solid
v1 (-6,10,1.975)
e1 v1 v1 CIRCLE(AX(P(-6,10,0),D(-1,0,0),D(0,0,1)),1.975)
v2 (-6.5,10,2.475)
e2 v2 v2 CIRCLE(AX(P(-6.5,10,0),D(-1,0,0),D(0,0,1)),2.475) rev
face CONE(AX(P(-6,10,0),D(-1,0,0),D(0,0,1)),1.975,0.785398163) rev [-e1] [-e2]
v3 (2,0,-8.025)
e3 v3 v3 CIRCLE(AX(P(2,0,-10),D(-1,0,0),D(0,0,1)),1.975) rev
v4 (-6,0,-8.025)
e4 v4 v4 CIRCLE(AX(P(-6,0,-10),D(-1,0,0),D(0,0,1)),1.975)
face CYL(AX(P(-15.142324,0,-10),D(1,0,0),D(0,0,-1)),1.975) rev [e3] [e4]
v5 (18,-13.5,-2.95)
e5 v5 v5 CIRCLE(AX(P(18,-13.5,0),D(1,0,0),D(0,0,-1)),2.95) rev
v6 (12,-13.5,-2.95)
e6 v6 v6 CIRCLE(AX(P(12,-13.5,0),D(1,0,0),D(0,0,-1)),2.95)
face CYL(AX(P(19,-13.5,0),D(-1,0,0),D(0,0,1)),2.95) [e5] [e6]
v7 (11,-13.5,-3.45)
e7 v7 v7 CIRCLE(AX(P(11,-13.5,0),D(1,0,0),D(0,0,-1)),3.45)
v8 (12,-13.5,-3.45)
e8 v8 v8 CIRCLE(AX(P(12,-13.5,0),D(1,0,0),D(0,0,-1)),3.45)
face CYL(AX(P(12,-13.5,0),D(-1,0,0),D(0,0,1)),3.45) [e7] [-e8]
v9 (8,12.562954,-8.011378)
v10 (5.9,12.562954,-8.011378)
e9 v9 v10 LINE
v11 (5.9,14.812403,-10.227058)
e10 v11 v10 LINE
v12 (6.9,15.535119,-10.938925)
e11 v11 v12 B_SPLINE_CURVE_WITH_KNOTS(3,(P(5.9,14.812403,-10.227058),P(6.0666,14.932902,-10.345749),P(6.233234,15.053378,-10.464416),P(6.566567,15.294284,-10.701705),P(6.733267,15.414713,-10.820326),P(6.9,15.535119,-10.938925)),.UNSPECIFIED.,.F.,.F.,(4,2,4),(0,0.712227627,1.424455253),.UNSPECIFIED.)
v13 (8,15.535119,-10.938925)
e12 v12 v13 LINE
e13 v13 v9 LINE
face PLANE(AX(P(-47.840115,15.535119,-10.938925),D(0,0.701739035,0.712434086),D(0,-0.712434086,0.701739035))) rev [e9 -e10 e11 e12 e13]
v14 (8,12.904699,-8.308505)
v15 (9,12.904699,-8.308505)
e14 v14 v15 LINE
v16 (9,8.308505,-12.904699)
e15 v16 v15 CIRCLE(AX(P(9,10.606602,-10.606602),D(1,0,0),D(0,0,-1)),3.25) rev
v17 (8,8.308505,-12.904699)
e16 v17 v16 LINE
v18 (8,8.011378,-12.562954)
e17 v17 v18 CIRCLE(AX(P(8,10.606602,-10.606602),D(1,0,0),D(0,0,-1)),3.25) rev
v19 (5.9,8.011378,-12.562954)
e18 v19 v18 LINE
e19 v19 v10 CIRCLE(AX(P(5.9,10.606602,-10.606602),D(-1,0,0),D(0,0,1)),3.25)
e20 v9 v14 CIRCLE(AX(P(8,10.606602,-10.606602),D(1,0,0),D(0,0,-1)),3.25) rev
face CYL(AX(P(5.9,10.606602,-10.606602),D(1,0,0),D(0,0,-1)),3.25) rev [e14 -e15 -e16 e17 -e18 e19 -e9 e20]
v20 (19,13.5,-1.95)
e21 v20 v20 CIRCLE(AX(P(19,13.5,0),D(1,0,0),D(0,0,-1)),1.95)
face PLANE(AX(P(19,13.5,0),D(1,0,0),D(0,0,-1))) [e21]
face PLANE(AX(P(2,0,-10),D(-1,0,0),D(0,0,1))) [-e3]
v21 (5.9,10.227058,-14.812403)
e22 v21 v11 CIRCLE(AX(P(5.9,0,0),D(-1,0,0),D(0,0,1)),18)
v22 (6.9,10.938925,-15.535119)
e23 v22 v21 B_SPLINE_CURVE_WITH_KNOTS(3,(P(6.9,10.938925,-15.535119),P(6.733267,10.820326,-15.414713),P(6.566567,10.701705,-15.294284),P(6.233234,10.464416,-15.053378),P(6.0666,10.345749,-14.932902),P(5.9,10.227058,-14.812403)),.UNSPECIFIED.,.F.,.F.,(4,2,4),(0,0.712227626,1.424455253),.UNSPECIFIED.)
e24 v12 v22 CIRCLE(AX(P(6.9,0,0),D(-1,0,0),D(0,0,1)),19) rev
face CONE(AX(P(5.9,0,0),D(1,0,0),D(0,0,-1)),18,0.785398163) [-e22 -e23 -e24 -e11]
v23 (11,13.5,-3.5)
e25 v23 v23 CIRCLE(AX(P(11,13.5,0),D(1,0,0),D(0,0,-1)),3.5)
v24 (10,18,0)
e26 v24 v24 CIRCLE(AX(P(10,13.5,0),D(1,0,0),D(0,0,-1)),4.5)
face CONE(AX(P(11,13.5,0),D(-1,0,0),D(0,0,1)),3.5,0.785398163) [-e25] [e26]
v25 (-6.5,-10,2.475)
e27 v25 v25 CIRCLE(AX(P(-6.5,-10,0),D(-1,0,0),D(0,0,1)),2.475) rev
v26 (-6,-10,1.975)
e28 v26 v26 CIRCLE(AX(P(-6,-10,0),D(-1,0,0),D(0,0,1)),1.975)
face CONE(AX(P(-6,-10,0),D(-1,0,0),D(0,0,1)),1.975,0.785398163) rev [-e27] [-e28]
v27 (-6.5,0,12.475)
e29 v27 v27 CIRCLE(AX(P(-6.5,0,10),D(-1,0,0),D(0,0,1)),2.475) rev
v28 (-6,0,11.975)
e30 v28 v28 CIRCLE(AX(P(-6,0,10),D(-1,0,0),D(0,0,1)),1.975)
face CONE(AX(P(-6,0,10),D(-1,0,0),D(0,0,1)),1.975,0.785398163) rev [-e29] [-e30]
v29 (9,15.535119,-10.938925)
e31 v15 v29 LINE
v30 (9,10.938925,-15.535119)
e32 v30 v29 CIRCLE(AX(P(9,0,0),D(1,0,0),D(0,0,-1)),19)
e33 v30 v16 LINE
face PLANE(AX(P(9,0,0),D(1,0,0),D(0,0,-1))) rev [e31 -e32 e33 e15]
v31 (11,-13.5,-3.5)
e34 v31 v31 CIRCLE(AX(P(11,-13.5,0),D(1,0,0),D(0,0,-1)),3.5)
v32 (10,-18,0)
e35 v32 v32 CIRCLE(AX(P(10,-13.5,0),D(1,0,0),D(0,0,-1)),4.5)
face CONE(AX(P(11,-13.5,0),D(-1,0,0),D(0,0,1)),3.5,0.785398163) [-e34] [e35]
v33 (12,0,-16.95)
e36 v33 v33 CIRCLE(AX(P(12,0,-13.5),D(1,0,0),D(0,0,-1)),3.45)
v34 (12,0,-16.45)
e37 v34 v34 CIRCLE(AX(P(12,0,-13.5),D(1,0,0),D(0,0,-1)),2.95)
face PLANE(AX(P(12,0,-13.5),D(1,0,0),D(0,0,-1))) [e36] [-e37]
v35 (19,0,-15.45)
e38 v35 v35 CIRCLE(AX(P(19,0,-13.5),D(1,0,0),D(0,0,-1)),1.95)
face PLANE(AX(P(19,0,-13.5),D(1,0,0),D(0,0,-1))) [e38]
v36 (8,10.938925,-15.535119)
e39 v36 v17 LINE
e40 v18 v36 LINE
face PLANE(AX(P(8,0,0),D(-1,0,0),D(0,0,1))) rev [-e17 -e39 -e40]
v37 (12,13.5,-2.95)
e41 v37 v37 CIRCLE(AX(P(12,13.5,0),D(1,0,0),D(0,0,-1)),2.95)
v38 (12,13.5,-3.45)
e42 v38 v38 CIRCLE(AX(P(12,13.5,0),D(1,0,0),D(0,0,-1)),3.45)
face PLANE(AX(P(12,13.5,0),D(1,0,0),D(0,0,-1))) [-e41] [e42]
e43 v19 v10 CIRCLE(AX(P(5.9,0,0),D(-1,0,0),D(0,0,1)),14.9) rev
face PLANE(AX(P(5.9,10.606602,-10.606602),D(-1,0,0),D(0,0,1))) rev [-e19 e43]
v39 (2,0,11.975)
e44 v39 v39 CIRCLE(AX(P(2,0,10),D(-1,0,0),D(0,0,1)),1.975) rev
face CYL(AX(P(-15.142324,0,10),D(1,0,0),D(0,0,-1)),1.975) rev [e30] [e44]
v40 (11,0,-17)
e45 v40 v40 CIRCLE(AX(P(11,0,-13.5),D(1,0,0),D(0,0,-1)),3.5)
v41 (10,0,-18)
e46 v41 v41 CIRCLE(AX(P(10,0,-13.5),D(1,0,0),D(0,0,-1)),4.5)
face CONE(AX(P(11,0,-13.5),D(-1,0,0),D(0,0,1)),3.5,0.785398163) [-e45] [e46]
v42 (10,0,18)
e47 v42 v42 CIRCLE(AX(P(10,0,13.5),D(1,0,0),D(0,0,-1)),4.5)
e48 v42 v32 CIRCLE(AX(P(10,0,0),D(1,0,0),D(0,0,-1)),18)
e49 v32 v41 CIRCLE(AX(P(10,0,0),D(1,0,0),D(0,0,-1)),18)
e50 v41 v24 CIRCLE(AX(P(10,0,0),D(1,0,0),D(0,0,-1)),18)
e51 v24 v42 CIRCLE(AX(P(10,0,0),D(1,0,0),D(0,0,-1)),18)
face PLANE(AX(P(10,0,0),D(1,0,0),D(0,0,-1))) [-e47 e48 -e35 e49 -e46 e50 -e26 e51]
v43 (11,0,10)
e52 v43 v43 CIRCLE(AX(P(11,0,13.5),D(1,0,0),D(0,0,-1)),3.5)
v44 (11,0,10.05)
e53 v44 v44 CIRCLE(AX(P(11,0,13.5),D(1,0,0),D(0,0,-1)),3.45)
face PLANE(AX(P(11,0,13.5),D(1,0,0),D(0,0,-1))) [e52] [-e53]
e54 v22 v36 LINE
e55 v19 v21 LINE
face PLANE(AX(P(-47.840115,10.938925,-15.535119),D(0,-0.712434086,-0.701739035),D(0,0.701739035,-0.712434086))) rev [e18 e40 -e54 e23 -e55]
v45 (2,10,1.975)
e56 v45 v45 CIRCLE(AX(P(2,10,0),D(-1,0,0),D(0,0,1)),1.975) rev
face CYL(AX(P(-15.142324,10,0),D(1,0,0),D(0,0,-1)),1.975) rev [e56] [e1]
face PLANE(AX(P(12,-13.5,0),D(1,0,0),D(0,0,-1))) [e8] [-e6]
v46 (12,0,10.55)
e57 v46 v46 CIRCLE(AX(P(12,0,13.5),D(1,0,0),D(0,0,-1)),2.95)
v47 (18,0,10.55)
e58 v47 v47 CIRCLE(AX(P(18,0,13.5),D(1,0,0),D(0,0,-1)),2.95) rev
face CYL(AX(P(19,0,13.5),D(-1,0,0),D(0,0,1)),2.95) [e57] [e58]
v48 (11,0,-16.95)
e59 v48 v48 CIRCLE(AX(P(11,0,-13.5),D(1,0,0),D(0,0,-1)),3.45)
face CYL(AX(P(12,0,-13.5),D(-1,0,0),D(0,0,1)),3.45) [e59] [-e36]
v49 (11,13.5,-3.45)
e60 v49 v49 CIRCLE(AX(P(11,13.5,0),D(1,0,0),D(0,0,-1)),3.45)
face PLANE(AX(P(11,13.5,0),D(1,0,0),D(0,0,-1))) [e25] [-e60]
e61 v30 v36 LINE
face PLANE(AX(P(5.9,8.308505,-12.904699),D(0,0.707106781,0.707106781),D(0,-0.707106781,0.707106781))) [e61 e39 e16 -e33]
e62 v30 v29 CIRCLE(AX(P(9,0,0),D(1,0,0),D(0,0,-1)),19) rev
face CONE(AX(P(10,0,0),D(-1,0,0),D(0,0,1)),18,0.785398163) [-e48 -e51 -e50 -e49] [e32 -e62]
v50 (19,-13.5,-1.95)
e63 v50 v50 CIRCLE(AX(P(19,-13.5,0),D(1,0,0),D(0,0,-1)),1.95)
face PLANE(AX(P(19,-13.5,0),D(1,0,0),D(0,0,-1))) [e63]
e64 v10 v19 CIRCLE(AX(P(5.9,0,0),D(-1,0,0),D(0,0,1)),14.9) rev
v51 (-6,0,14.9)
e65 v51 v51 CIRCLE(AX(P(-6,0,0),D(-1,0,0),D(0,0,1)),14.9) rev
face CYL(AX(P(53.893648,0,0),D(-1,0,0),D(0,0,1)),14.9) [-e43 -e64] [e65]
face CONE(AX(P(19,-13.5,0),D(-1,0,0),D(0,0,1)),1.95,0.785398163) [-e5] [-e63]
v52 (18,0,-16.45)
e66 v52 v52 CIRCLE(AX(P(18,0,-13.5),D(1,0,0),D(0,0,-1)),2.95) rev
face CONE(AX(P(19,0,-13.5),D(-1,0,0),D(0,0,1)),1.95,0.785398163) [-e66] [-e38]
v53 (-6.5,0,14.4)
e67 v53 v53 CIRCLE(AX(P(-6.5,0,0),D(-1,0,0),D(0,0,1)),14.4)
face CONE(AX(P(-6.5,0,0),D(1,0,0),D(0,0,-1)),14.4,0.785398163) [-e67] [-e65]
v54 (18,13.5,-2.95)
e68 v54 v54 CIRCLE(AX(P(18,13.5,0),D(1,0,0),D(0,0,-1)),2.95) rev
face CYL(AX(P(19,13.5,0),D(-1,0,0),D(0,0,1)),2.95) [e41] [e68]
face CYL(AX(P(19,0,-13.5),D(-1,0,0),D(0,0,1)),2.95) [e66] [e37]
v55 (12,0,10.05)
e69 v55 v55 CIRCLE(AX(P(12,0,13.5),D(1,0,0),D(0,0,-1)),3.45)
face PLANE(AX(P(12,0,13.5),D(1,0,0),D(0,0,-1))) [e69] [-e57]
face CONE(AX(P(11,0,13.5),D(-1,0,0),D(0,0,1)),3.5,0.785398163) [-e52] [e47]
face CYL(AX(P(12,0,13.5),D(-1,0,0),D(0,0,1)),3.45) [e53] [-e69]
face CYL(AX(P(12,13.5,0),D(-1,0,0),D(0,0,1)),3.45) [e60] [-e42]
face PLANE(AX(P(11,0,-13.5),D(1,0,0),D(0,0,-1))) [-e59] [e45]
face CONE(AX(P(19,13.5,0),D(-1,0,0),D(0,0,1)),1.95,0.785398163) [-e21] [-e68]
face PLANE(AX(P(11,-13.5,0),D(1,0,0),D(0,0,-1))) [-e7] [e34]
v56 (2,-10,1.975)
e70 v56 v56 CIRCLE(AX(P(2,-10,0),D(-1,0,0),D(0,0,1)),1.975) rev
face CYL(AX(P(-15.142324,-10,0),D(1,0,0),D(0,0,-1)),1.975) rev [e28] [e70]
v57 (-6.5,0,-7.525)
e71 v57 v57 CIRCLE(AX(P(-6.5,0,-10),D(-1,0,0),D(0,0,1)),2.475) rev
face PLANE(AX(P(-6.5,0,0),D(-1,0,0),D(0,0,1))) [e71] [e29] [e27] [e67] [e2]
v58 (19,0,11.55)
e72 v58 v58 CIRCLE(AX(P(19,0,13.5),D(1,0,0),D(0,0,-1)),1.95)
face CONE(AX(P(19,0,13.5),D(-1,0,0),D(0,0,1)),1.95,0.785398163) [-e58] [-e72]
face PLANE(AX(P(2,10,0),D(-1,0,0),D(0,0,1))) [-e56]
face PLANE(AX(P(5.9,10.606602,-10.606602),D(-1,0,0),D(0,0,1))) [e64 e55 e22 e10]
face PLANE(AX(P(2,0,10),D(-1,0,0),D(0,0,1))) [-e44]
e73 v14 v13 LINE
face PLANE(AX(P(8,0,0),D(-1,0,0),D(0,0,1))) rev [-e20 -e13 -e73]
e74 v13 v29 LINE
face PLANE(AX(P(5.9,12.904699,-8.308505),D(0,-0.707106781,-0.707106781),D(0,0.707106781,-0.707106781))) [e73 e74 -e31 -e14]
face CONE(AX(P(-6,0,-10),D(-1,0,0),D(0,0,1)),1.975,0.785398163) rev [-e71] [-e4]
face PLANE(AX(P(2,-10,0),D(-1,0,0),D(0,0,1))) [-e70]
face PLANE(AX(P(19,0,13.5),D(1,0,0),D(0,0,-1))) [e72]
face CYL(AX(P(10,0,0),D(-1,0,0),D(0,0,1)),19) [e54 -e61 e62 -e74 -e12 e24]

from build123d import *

# Parameters (mm, degrees)
BOSS_EXTRUDE1_OUTLINE_R   = 19
BOSS_EXTRUDE1_DEPTH       = 2
BOSS_EXTRUDE1_START       = -8
BOSS_EXTRUDE1_2_OUTLINE_R = 2.5
BOSS_EXTRUDE1_2_DEPTH     = 8
SKETCH2_R                 = 3.5
CUT_EXTRUDE1_DEPTH        = 29.670542374
SKETCH3_R                 = 2.95
BOSS_EXTRUDE2_DEPTH       = 9
BOSS_EXTRUDE3_START       = 4
SKETCH5_R                 = 3.5
BOSS_EXTRUDE3_DEPTH       = 4
SKETCH6_R                 = 8.643788813
CUT_EXTRUDE2_DEPTH        = 12
BOSS_EXTRUDE4_START       = -2
SKETCH7_R                 = 3.5
BOSS_EXTRUDE4_DEPTH       = 2
SKETCH8_R                 = 12.5
BOSS_EXTRUDE5_DEPTH       = 10
SKETCH9_R                 = 2
CUT_EXTRUDE3_DEPTH        = 4
SKETCH10_R                = 15
SKETCH10_R_2              = 12.5
BOSS_EXTRUDE6_DEPTH       = 10
SKETCH11_R                = 16.225854921
SKETCH11_R_2              = 14.9
CUT_EXTRUDE4_DEPTH        = 10
SKETCH12_R                = 4.5
BOSS_EXTRUDE7_DEPTH       = 1
BOSS_EXTRUDE8_START       = 2
SKETCH13_R                = 14.9
SKETCH13_R_2              = 2
BOSS_EXTRUDE8_DEPTH       = 2
SKETCH14_R                = 3.45
BOSS_EXTRUDE9_DEPTH       = 1
CHAMFER1_SIZE             = 1
CHAMFER2_SIZE             = 1
BOSS_EXTRUDE12_START      = 2.5
SKETCH21_R                = 14.9
SKETCH21_R_2              = 2
BOSS_EXTRUDE12_DEPTH      = 2.5
CHAMFER3_SIZE             = 0.5
SKETCH17_R                = 3.065
BOSS_EXTRUDE10_DEPTH      = 1
CHAMFER5_SIZE             = 0.1
CUT_EXTRUDE7_DEPTH        = 2.1
CUT_EXTRUDE7_DEPTH_BACK   = 1
BOSS_EXTRUDE11_START      = 2.1
BOSS_EXTRUDE11_DEPTH      = 2.1
CHAMFER7_SIZE             = 1
CHAMFER8_SIZE             = 1
CUT_EXTRUDE8_START        = -7
SKETCH22_R                = 7.553732041
SKETCH22_R_2              = 2.95
CUT_EXTRUDE8_DEPTH        = 7
SKETCH23_R                = 3.055522854
SKETCH23_R_2              = 1.975
BOSS_EXTRUDE13_DEPTH      = 8.5
CHAMFER9_SIZE             = 0.5


with BuildPart() as part:
    # Boss-Extrude1: read off the stored shape, not the designer's step
    # Boss-Extrude1 outline → Boss-Extrude1 (new body)
    with BuildSketch(Plane(origin=(8, 0, 0), x_dir=(0, 0, -1), z_dir=(1, 0, 0))):
        Circle(BOSS_EXTRUDE1_OUTLINE_R)
    extrude(amount=BOSS_EXTRUDE1_DEPTH)

    # Boss-Extrude1 2 outline → Boss-Extrude1 2 (add)
    with BuildSketch(Plane(origin=(8, 0, 0), x_dir=(0, 0, -1), z_dir=(1, 0, 0)).offset(BOSS_EXTRUDE1_START)):
        with BuildLine():
            ThreePointArc((-4.827976462, 5.739393982), (-4.973419937, 5.613830611), (-5.115599083, 5.484582575))
            ThreePointArc((-5.115599083, 5.484582575), (-4.796933675, 4.315856884), (-3.983306334, 3.41837266))
            ThreePointArc((-3.983306334, 3.41837266), (-4.319842312, 2.981771856), (-4.608733854, 2.512284471))
            ThreePointArc((-4.608733854, 2.512284471), (-5.736412412, 2.954786958), (-6.942190227, 2.838308449))
            ThreePointArc((-6.942190227, 2.838308449), (-7.01262182, 2.659536653), (-7.078450644, 2.479019256))
            ThreePointArc((-7.078450644, 2.479019256), (-6.253152528, 1.592255251), (-5.115639582, 1.175683915))
            ThreePointArc((-5.115639582, 1.175683915), (-5.21072888, 0.632697034), (-5.24834797, 0.082732007))
            ThreePointArc((-5.24834797, 0.082732007), (-6.452498904, -0.049509856), (-7.466031873, -0.712999344))
            ThreePointArc((-7.466031873, -0.712999344), (-7.445316556, -0.904025102), (-7.419714468, -1.094457498))
            ThreePointArc((-7.419714468, -1.094457498), (-6.276849497, -1.496112872), (-5.076041451, -1.336339847))
            ThreePointArc((-5.076041451, -1.336339847), (-4.907900258, -1.861321052), (-4.685628816, -2.365773362))
            ThreePointArc((-4.685628816, -2.365773362), (-5.690395658, -3.042464558), (-6.279495593, -4.10096758))
            ThreePointArc((-6.279495593, -4.10096758), (-6.172378994, -4.2604856), (-6.061211124, -4.41720723))
            ThreePointArc((-6.061211124, -4.41720723), (-4.862595889, -4.241739566), (-3.873583397, -3.542224254))
            ThreePointArc((-3.873583397, -3.542224254), (-3.480730833, -3.928932917), (-3.049488568, -4.272308565))
            ThreePointArc((-3.049488568, -4.272308565), (-3.624691343, -5.338427296), (-3.654402549, -6.549453566))
            ThreePointArc((-3.654402549, -6.549453566), (-3.48542379, -6.640920192), (-3.314157357, -6.728028018))
            ThreePointArc((-3.314157357, -6.728028018), (-2.334380164, -6.015634844), (-1.783734068, -4.936627773))
            ThreePointArc((-1.783734068, -4.936627773), (-1.256167922, -5.0964736), (-0.714747239, -5.200109363))
            ThreePointArc((-0.714747239, -5.200109363), (-0.728613924, -6.411420676), (-0.192129921, -7.497538669))
            ThreePointArc((-0.192129921, -7.497538669), (0, -7.5), (0.192129921, -7.497538669))
            ThreePointArc((0.192129921, -7.497538669), (0.728613924, -6.411420676), (0.714747239, -5.200109363))
            ThreePointArc((0.714747239, -5.200109363), (1.256167922, -5.0964736), (1.783734068, -4.936627773))
            ThreePointArc((1.783734068, -4.936627773), (2.334380164, -6.015634844), (3.314157357, -6.728028018))
            ThreePointArc((3.314157357, -6.728028018), (3.48542379, -6.640920192), (3.654402549, -6.549453566))
            ThreePointArc((3.654402549, -6.549453566), (3.624691343, -5.338427296), (3.049488568, -4.272308565))
            ThreePointArc((3.049488568, -4.272308565), (3.480730833, -3.928932917), (3.873583397, -3.542224254))
            ThreePointArc((3.873583397, -3.542224254), (4.862595889, -4.241739566), (6.061211124, -4.41720723))
            ThreePointArc((6.061211124, -4.41720723), (6.172378994, -4.2604856), (6.279495593, -4.10096758))
            ThreePointArc((6.279495593, -4.10096758), (5.690395658, -3.042464558), (4.685628816, -2.365773362))
            ThreePointArc((4.685628816, -2.365773362), (4.907900258, -1.861321052), (5.076041451, -1.336339847))
            ThreePointArc((5.076041451, -1.336339847), (6.276849497, -1.496112872), (7.419714468, -1.094457498))
            ThreePointArc((7.419714468, -1.094457498), (7.445316556, -0.904025102), (7.466031873, -0.712999344))
            ThreePointArc((7.466031873, -0.712999344), (6.452498904, -0.049509856), (5.24834797, 0.082732007))
            ThreePointArc((5.24834797, 0.082732007), (5.21072888, 0.632697034), (5.115639582, 1.175683915))
            ThreePointArc((5.115639582, 1.175683915), (6.253152528, 1.592255251), (7.078450644, 2.479019256))
            ThreePointArc((7.078450644, 2.479019256), (7.01262182, 2.659536653), (6.942190227, 2.838308449))
            ThreePointArc((6.942190227, 2.838308449), (5.736412412, 2.954786958), (4.608733854, 2.512284471))
            ThreePointArc((4.608733854, 2.512284471), (4.319842312, 2.981771856), (3.983306334, 3.41837266))
            ThreePointArc((3.983306334, 3.41837266), (4.796933675, 4.315856884), (5.115599083, 5.484582575))
            ThreePointArc((5.115599083, 5.484582575), (4.973419937, 5.613830611), (4.827976462, 5.739393982))
            ThreePointArc((4.827976462, 5.739393982), (3.706182968, 5.282177689), (2.913314353, 4.366302839))
            ThreePointArc((2.913314353, 4.366302839), (2.43933193, 4.647758679), (1.93844561, 4.877953425))
            ThreePointArc((1.93844561, 4.877953425), (2.241795126, 6.050747718), (1.980825421, 7.233694122))
            ThreePointArc((1.980825421, 7.233694122), (1.794867482, 7.282063631), (1.607731473, 7.325653521))
            ThreePointArc((1.607731473, 7.325653521), (0.82691167, 6.399485168), (0.550489643, 5.220053846))
            ThreePointArc((0.550489643, 5.220053846), (0, 5.249), (-0.550489643, 5.220053846))
            ThreePointArc((-0.550489643, 5.220053846), (-0.82691167, 6.399485168), (-1.607731473, 7.325653521))
            ThreePointArc((-1.607731473, 7.325653521), (-1.794867482, 7.282063631), (-1.980825421, 7.233694122))
            ThreePointArc((-1.980825421, 7.233694122), (-2.241795126, 6.050747718), (-1.93844561, 4.877953425))
            ThreePointArc((-1.93844561, 4.877953425), (-2.43933193, 4.647758679), (-2.913314353, 4.366302839))
            ThreePointArc((-2.913314353, 4.366302839), (-3.706182968, 5.282177689), (-4.827976462, 5.739393982))
        make_face()
        Circle(BOSS_EXTRUDE1_2_OUTLINE_R, mode=Mode.SUBTRACT)
    extrude(amount=BOSS_EXTRUDE1_2_DEPTH)

    # Sketch2 → Cut-Extrude1 (cut, through all)
    with BuildSketch(Plane(origin=(10, 0, 0), x_dir=(0, 0, -1), z_dir=(1, 0, 0))):
        Circle(SKETCH2_R)
    extrude(amount=-CUT_EXTRUDE1_DEPTH, mode=Mode.SUBTRACT)

    # Sketch3 → Boss-Extrude2 (add)
    with BuildSketch(Plane(origin=(10, 0, 0), x_dir=(0, 0, -1), z_dir=(1, 0, 0))):
        with Locations((-13.5, 0)):
            Circle(SKETCH3_R)
        with Locations((0, 13.5)):
            Circle(SKETCH3_R)
        with Locations((13.5, 0)):
            Circle(SKETCH3_R)
        with Locations((0, -13.5)):
            Circle(SKETCH3_R)
    extrude(amount=BOSS_EXTRUDE2_DEPTH)

    # Sketch5 → Boss-Extrude3 (add)
    with BuildSketch(Plane.ZY.offset(BOSS_EXTRUDE3_START)):
        with BuildLine():
            ThreePointArc((3.983306334, 3.41837266), (4.796933675, 4.315856884), (5.115599083, 5.484582575))
            ThreePointArc((5.115599083, 5.484582575), (4.973419937, 5.613830611), (4.827976462, 5.739393982))
            ThreePointArc((4.827976462, 5.739393982), (3.706182968, 5.282177689), (2.913314353, 4.366302839))
            ThreePointArc((2.913314353, 4.366302839), (2.43933193, 4.647758679), (1.93844561, 4.877953425))
            ThreePointArc((1.93844561, 4.877953425), (2.241795126, 6.050747718), (1.980825421, 7.233694122))
            ThreePointArc((1.980825421, 7.233694122), (1.794867482, 7.282063631), (1.607731473, 7.325653521))
            ThreePointArc((1.607731473, 7.325653521), (0.82691167, 6.399485168), (0.550489643, 5.220053846))
            ThreePointArc((0.550489643, 5.220053846), (0, 5.249), (-0.550489643, 5.220053846))
            ThreePointArc((-0.550489643, 5.220053846), (-0.82691167, 6.399485168), (-1.607731473, 7.325653521))
            ThreePointArc((-1.607731473, 7.325653521), (-1.794867482, 7.282063631), (-1.980825421, 7.233694122))
            ThreePointArc((-1.980825421, 7.233694122), (-2.241795126, 6.050747718), (-1.93844561, 4.877953425))
            ThreePointArc((-1.93844561, 4.877953425), (-2.43933193, 4.647758679), (-2.913314353, 4.366302839))
            ThreePointArc((-2.913314353, 4.366302839), (-3.706182968, 5.282177689), (-4.827976462, 5.739393982))
            ThreePointArc((-4.827976462, 5.739393982), (-4.973419937, 5.613830611), (-5.115599083, 5.484582575))
            ThreePointArc((-5.115599083, 5.484582575), (-4.796933675, 4.315856884), (-3.983306334, 3.41837266))
            ThreePointArc((-3.983306334, 3.41837266), (-4.319842312, 2.981771856), (-4.608733854, 2.512284471))
            ThreePointArc((-4.608733854, 2.512284471), (-5.736412412, 2.954786958), (-6.942190227, 2.838308449))
            ThreePointArc((-6.942190227, 2.838308449), (-7.01262182, 2.659536653), (-7.078450644, 2.479019256))
            ThreePointArc((-7.078450644, 2.479019256), (-6.253152529, 1.592255251), (-5.115639582, 1.175683915))
            ThreePointArc((-5.115639582, 1.175683915), (-5.21072888, 0.632697035), (-5.24834797, 0.082732007))
            ThreePointArc((-5.24834797, 0.082732007), (-6.452498904, -0.049509856), (-7.466031873, -0.712999344))
            ThreePointArc((-7.466031873, -0.712999344), (-7.445316556, -0.904025102), (-7.419714468, -1.094457498))
            ThreePointArc((-7.419714468, -1.094457498), (-6.276849497, -1.496112872), (-5.076041451, -1.336339847))
            ThreePointArc((-5.076041451, -1.336339847), (-4.907900258, -1.861321052), (-4.685628816, -2.365773362))
            ThreePointArc((-4.685628816, -2.365773362), (-5.690395658, -3.042464558), (-6.279495593, -4.10096758))
            ThreePointArc((-6.279495593, -4.10096758), (-6.172378994, -4.2604856), (-6.061211124, -4.41720723))
            ThreePointArc((-6.061211124, -4.41720723), (-4.862595889, -4.241739566), (-3.873583397, -3.542224254))
            ThreePointArc((-3.873583397, -3.542224254), (-3.480730833, -3.928932917), (-3.049488568, -4.272308565))
            ThreePointArc((-3.049488568, -4.272308565), (-3.624691343, -5.338427296), (-3.654402549, -6.549453566))
            ThreePointArc((-3.654402549, -6.549453566), (-3.48542379, -6.640920192), (-3.314157357, -6.728028018))
            ThreePointArc((-3.314157357, -6.728028018), (-2.334380164, -6.015634844), (-1.783734068, -4.936627773))
            ThreePointArc((-1.783734068, -4.936627773), (-1.256167922, -5.0964736), (-0.714747239, -5.200109363))
            ThreePointArc((-0.714747239, -5.200109363), (-0.728613924, -6.411420676), (-0.192129921, -7.497538669))
            ThreePointArc((-0.192129921, -7.497538669), (0, -7.5), (0.192129921, -7.497538669))
            ThreePointArc((0.192129921, -7.497538669), (0.728613924, -6.411420676), (0.714747239, -5.200109363))
            ThreePointArc((0.714747239, -5.200109363), (1.256167922, -5.0964736), (1.783734068, -4.936627773))
            ThreePointArc((1.783734068, -4.936627773), (2.334380164, -6.015634844), (3.314157357, -6.728028018))
            ThreePointArc((3.314157357, -6.728028018), (3.48542379, -6.640920192), (3.654402549, -6.549453566))
            ThreePointArc((3.654402549, -6.549453566), (3.624691343, -5.338427296), (3.049488568, -4.272308565))
            ThreePointArc((3.049488568, -4.272308565), (3.480730833, -3.928932917), (3.873583397, -3.542224254))
            ThreePointArc((3.873583397, -3.542224254), (4.862595889, -4.241739566), (6.061211124, -4.41720723))
            ThreePointArc((6.061211124, -4.41720723), (6.172378994, -4.2604856), (6.279495593, -4.10096758))
            ThreePointArc((6.279495593, -4.10096758), (5.690395658, -3.042464558), (4.685628816, -2.365773362))
            ThreePointArc((4.685628816, -2.365773362), (4.907900258, -1.861321052), (5.076041451, -1.336339847))
            ThreePointArc((5.076041451, -1.336339847), (6.276849497, -1.496112872), (7.419714468, -1.094457498))
            ThreePointArc((7.419714468, -1.094457498), (7.445316556, -0.904025102), (7.466031873, -0.712999344))
            ThreePointArc((7.466031873, -0.712999344), (6.452498904, -0.049509856), (5.24834797, 0.082732007))
            ThreePointArc((5.24834797, 0.082732007), (5.21072888, 0.632697035), (5.115639582, 1.175683915))
            ThreePointArc((5.115639582, 1.175683915), (6.253152529, 1.592255251), (7.078450644, 2.479019256))
            ThreePointArc((7.078450644, 2.479019256), (7.01262182, 2.659536653), (6.942190227, 2.838308449))
            ThreePointArc((6.942190227, 2.838308449), (5.736412412, 2.954786958), (4.608733854, 2.512284471))
            ThreePointArc((4.608733854, 2.512284471), (4.319842312, 2.981771856), (3.983306334, 3.41837266))
        make_face()
        with Locations(Location((0, 0, 0), (0, 0, 180))):
            Circle(SKETCH5_R, mode=Mode.SUBTRACT)
    extrude(amount=-BOSS_EXTRUDE3_DEPTH)

    # Sketch6 → Cut-Extrude2 (cut)
    with BuildSketch(Plane.ZY.offset(4)):
        Circle(SKETCH6_R)
    extrude(amount=-CUT_EXTRUDE2_DEPTH, mode=Mode.SUBTRACT)

    # Sketch7 → Boss-Extrude4 (add)
    with BuildSketch(Plane.ZY.offset(-8).offset(BOSS_EXTRUDE4_START)):
        Circle(SKETCH7_R)
    extrude(amount=BOSS_EXTRUDE4_DEPTH)

    # Sketch8 → Boss-Extrude5 (add)
    with BuildSketch(Plane.ZY.offset(-8)):
        Circle(SKETCH8_R)
    extrude(amount=BOSS_EXTRUDE5_DEPTH)

    # Sketch9 → Cut-Extrude3 (cut)
    with BuildSketch(Plane.ZY.offset(2)):
        with Locations((-10, 0)):
            Circle(SKETCH9_R)
        with Locations((0, 10)):
            Circle(SKETCH9_R)
        with Locations((10, 0)):
            Circle(SKETCH9_R)
        with Locations((0, -10)):
            Circle(SKETCH9_R)
    extrude(amount=-CUT_EXTRUDE3_DEPTH, mode=Mode.SUBTRACT)

    # Sketch10 → Boss-Extrude6 (add)
    with BuildSketch(Plane.ZY.offset(-8)):
        with Locations(Location((0, 0, 0), (0, 0, 180))):
            Circle(SKETCH10_R)
        Circle(SKETCH10_R_2, mode=Mode.SUBTRACT)
    extrude(amount=BOSS_EXTRUDE6_DEPTH)

    # Sketch11 → Cut-Extrude4 (cut)
    with BuildSketch(Plane.ZY.offset(2)):
        Circle(SKETCH11_R)
        Circle(SKETCH11_R_2, mode=Mode.SUBTRACT)
    extrude(amount=-CUT_EXTRUDE4_DEPTH, mode=Mode.SUBTRACT)

    # Sketch12 → Boss-Extrude7 (add)
    with BuildSketch(Plane(origin=(10, 0, 0), x_dir=(0, 0, -1), z_dir=(1, 0, 0))):
        with Locations((-13.5, 0)):
            Circle(SKETCH12_R)
        with Locations((0, 13.5)):
            Circle(SKETCH12_R)
        with Locations((13.5, 0)):
            Circle(SKETCH12_R)
        with Locations((0, -13.5)):
            Circle(SKETCH12_R)
    extrude(amount=BOSS_EXTRUDE7_DEPTH)

    # Sketch13 → Boss-Extrude8 (add)
    with BuildSketch(Plane.ZY.offset(2).offset(BOSS_EXTRUDE8_START)):
        Circle(SKETCH13_R)
        with Locations((-10, 0)):
            Circle(SKETCH13_R_2, mode=Mode.SUBTRACT)
        with Locations((0, 10)):
            Circle(SKETCH13_R_2, mode=Mode.SUBTRACT)
        with Locations((10, 0)):
            Circle(SKETCH13_R_2, mode=Mode.SUBTRACT)
        with Locations((0, -10)):
            Circle(SKETCH13_R_2, mode=Mode.SUBTRACT)
    extrude(amount=-BOSS_EXTRUDE8_DEPTH)

    # Sketch14 → Boss-Extrude9 (add)
    with BuildSketch(Plane(origin=(11, 0, 0), x_dir=(0, 0, -1), z_dir=(1, 0, 0))):
        with Locations((-13.5, 0)):
            Circle(SKETCH14_R)
        with Locations((0, 13.5)):
            Circle(SKETCH14_R)
        with Locations((13.5, 0)):
            Circle(SKETCH14_R)
        with Locations((0, -13.5)):
            Circle(SKETCH14_R)
    extrude(amount=BOSS_EXTRUDE9_DEPTH)

    # Chamfer1
    chamfer1_edges = [part.edges().sort_by_distance(p)[0] for p in [
        (11, 0, 18),
        (11, 13.5, 4.5),
        (11, 0, -9),
        (11, -13.5, 4.5),
    ]]
    chamfer(chamfer1_edges, length=CHAMFER1_SIZE - 0.0001)  # a hair under: the kernel refuses the full size

    # Chamfer2
    chamfer2_edges = [part.edges().sort_by_distance(p)[0] for p in [
        (19, 0, 16.45),
        (19, 13.5, 2.95),
        (19, 0, -10.55),
        (19, -13.5, 2.95),
    ]]
    chamfer(chamfer2_edges, length=CHAMFER2_SIZE)

    # Sketch21 → Boss-Extrude12 (add)
    with BuildSketch(Plane.ZY.offset(4).offset(BOSS_EXTRUDE12_START)):
        Circle(SKETCH21_R)
        with Locations((-10, 0)):
            Circle(SKETCH21_R_2, mode=Mode.SUBTRACT)
        with Locations((0, 10)):
            Circle(SKETCH21_R_2, mode=Mode.SUBTRACT)
        with Locations((10, 0)):
            Circle(SKETCH21_R_2, mode=Mode.SUBTRACT)
        with Locations((0, -10)):
            Circle(SKETCH21_R_2, mode=Mode.SUBTRACT)
    extrude(amount=-BOSS_EXTRUDE12_DEPTH)

    # Chamfer3
    chamfer3_edges = [part.edges().sort_by_distance(p)[0] for p in [
        (-6.5, 0, -14.9),
    ]]
    chamfer(chamfer3_edges, length=CHAMFER3_SIZE)

    # Sketch17 → Boss-Extrude10 (add)
    with BuildSketch(Plane(origin=(15, 0, 0), x_dir=(0, 0, -1), z_dir=(1, 0, 0))):
        with Locations((0, 13.5)):
            Circle(SKETCH17_R)
        with Locations((13.5, 0)):
            Circle(SKETCH17_R)
        with Locations((0, -13.5)):
            Circle(SKETCH17_R)
        with Locations((-13.5, 0)):
            Circle(SKETCH17_R)
    extrude(amount=BOSS_EXTRUDE10_DEPTH)

    # Chamfer5
    chamfer5_edges = [part.edges().sort_by_distance(p)[0] for p in [
        (16, 13.5, 3.065),
        (16, 0, -10.435),
        (16, -13.5, 3.065),
        (16, 0, 16.565),
    ]]
    chamfer(chamfer5_edges, length=CHAMFER5_SIZE)

    # Sketch19 → Cut-Extrude7 (cut, two sides: drawn at the far end of the back side and taken through both)
    with BuildSketch(Plane.ZY.offset(-8).offset(-CUT_EXTRUDE7_DEPTH_BACK)):
        with BuildLine():
            Line((-8.308504679, 12.904698757), (-10.951006704, 15.547200782))
            ThreePointArc((-10.951006704, 15.547200782), (-13.446932736, 13.446932736), (-15.547200782, 10.951006704))
            Line((-15.547200782, 10.951006704), (-12.904698757, 8.308504679))
            ThreePointArc((-12.904698757, 8.308504679), (-8.308504679, 8.308504679), (-8.308504679, 12.904698757))
        make_face()
    extrude(amount=CUT_EXTRUDE7_DEPTH + CUT_EXTRUDE7_DEPTH_BACK, mode=Mode.SUBTRACT)

    # Sketch20 → Boss-Extrude11 (add)
    with BuildSketch(Plane.ZY.offset(-8).offset(BOSS_EXTRUDE11_START)):
        with BuildLine():
            Line((-15.535118985, 10.938924907), (-12.562954218, 8.011378241))
            ThreePointArc((-12.562954218, 8.011378241), (10.53589104, -10.53589104), (-8.011378241, 12.562954218))
            Line((-8.011378241, 12.562954218), (-10.938924907, 15.535118985))
            ThreePointArc((-10.938924907, 15.535118985), (13.435028843, -13.435028843), (-15.535118985, 10.938924907))
        make_face()
    extrude(amount=-BOSS_EXTRUDE11_DEPTH)

    # Chamfer7
    chamfer7_edges = [part.edges().sort_by_distance(p)[0] for p in [
        (5.9, -13.435028843, 13.435028843),
    ]]
    chamfer(chamfer7_edges, length=CHAMFER7_SIZE)

    # Chamfer8
    chamfer8_edges = [part.edges().sort_by_distance(p)[0] for p in [
        (10, 0, 19),
    ]]
    chamfer(chamfer8_edges, length=CHAMFER8_SIZE - 0.0001)  # a hair under: the kernel refuses the full size

    # Sketch22 → Cut-Extrude8 (cut)
    # profile 1 of 4: a face of its own
    with BuildSketch(Plane(origin=(19, 0, 0), x_dir=(0, 0, -1), z_dir=(1, 0, 0)).offset(CUT_EXTRUDE8_START)):
        with Locations((0, 13.5)):
            Circle(SKETCH22_R)
        with Locations((0, 13.5)):
            Circle(SKETCH22_R_2, mode=Mode.SUBTRACT)
    # profile 2 of 4: a face of its own
    with BuildSketch(Plane(origin=(19, 0, 0), x_dir=(0, 0, -1), z_dir=(1, 0, 0)).offset(CUT_EXTRUDE8_START)):
        with Locations((13.5, 0)):
            Circle(SKETCH22_R)
        with Locations((13.5, 0)):
            Circle(SKETCH22_R_2, mode=Mode.SUBTRACT)
    # profile 3 of 4: a face of its own
    with BuildSketch(Plane(origin=(19, 0, 0), x_dir=(0, 0, -1), z_dir=(1, 0, 0)).offset(CUT_EXTRUDE8_START)):
        with Locations((0, -13.5)):
            Circle(SKETCH22_R)
        with Locations((0, -13.5)):
            Circle(SKETCH22_R_2, mode=Mode.SUBTRACT)
    # profile 4 of 4: a face of its own
    with BuildSketch(Plane(origin=(19, 0, 0), x_dir=(0, 0, -1), z_dir=(1, 0, 0)).offset(CUT_EXTRUDE8_START)):
        with Locations((-13.5, 0)):
            Circle(SKETCH22_R)
        with Locations((-13.5, 0)):
            Circle(SKETCH22_R_2, mode=Mode.SUBTRACT)
    extrude(amount=CUT_EXTRUDE8_DEPTH, mode=Mode.SUBTRACT)

    # Sketch23 → Boss-Extrude13 (add)
    # profile 1 of 4: a face of its own
    with BuildSketch(Plane.ZY.offset(-2)):
        with Locations((-10, 0)):
            Circle(SKETCH23_R)
        with Locations((-10, 0)):
            Circle(SKETCH23_R_2, mode=Mode.SUBTRACT)
    # profile 2 of 4: a face of its own
    with BuildSketch(Plane.ZY.offset(-2)):
        with Locations((0, 10)):
            Circle(SKETCH23_R)
        with Locations((0, 10)):
            Circle(SKETCH23_R_2, mode=Mode.SUBTRACT)
    # profile 3 of 4: a face of its own
    with BuildSketch(Plane.ZY.offset(-2)):
        with Locations((10, 0)):
            Circle(SKETCH23_R)
        with Locations((10, 0)):
            Circle(SKETCH23_R_2, mode=Mode.SUBTRACT)
    # profile 4 of 4: a face of its own
    with BuildSketch(Plane.ZY.offset(-2)):
        with Locations((0, -10)):
            Circle(SKETCH23_R)
        with Locations((0, -10)):
            Circle(SKETCH23_R_2, mode=Mode.SUBTRACT)
    extrude(amount=BOSS_EXTRUDE13_DEPTH)

    # Chamfer9
    chamfer9_edges = [part.edges().sort_by_distance(p)[0] for p in [
        (-6.5, 0, -11.975),
        (-6.5, 10, -1.975),
        (-6.5, 0, 8.025),
        (-6.5, -10, -1.975),
    ]]
    chamfer(chamfer9_edges, length=CHAMFER9_SIZE)


solid = part.part
